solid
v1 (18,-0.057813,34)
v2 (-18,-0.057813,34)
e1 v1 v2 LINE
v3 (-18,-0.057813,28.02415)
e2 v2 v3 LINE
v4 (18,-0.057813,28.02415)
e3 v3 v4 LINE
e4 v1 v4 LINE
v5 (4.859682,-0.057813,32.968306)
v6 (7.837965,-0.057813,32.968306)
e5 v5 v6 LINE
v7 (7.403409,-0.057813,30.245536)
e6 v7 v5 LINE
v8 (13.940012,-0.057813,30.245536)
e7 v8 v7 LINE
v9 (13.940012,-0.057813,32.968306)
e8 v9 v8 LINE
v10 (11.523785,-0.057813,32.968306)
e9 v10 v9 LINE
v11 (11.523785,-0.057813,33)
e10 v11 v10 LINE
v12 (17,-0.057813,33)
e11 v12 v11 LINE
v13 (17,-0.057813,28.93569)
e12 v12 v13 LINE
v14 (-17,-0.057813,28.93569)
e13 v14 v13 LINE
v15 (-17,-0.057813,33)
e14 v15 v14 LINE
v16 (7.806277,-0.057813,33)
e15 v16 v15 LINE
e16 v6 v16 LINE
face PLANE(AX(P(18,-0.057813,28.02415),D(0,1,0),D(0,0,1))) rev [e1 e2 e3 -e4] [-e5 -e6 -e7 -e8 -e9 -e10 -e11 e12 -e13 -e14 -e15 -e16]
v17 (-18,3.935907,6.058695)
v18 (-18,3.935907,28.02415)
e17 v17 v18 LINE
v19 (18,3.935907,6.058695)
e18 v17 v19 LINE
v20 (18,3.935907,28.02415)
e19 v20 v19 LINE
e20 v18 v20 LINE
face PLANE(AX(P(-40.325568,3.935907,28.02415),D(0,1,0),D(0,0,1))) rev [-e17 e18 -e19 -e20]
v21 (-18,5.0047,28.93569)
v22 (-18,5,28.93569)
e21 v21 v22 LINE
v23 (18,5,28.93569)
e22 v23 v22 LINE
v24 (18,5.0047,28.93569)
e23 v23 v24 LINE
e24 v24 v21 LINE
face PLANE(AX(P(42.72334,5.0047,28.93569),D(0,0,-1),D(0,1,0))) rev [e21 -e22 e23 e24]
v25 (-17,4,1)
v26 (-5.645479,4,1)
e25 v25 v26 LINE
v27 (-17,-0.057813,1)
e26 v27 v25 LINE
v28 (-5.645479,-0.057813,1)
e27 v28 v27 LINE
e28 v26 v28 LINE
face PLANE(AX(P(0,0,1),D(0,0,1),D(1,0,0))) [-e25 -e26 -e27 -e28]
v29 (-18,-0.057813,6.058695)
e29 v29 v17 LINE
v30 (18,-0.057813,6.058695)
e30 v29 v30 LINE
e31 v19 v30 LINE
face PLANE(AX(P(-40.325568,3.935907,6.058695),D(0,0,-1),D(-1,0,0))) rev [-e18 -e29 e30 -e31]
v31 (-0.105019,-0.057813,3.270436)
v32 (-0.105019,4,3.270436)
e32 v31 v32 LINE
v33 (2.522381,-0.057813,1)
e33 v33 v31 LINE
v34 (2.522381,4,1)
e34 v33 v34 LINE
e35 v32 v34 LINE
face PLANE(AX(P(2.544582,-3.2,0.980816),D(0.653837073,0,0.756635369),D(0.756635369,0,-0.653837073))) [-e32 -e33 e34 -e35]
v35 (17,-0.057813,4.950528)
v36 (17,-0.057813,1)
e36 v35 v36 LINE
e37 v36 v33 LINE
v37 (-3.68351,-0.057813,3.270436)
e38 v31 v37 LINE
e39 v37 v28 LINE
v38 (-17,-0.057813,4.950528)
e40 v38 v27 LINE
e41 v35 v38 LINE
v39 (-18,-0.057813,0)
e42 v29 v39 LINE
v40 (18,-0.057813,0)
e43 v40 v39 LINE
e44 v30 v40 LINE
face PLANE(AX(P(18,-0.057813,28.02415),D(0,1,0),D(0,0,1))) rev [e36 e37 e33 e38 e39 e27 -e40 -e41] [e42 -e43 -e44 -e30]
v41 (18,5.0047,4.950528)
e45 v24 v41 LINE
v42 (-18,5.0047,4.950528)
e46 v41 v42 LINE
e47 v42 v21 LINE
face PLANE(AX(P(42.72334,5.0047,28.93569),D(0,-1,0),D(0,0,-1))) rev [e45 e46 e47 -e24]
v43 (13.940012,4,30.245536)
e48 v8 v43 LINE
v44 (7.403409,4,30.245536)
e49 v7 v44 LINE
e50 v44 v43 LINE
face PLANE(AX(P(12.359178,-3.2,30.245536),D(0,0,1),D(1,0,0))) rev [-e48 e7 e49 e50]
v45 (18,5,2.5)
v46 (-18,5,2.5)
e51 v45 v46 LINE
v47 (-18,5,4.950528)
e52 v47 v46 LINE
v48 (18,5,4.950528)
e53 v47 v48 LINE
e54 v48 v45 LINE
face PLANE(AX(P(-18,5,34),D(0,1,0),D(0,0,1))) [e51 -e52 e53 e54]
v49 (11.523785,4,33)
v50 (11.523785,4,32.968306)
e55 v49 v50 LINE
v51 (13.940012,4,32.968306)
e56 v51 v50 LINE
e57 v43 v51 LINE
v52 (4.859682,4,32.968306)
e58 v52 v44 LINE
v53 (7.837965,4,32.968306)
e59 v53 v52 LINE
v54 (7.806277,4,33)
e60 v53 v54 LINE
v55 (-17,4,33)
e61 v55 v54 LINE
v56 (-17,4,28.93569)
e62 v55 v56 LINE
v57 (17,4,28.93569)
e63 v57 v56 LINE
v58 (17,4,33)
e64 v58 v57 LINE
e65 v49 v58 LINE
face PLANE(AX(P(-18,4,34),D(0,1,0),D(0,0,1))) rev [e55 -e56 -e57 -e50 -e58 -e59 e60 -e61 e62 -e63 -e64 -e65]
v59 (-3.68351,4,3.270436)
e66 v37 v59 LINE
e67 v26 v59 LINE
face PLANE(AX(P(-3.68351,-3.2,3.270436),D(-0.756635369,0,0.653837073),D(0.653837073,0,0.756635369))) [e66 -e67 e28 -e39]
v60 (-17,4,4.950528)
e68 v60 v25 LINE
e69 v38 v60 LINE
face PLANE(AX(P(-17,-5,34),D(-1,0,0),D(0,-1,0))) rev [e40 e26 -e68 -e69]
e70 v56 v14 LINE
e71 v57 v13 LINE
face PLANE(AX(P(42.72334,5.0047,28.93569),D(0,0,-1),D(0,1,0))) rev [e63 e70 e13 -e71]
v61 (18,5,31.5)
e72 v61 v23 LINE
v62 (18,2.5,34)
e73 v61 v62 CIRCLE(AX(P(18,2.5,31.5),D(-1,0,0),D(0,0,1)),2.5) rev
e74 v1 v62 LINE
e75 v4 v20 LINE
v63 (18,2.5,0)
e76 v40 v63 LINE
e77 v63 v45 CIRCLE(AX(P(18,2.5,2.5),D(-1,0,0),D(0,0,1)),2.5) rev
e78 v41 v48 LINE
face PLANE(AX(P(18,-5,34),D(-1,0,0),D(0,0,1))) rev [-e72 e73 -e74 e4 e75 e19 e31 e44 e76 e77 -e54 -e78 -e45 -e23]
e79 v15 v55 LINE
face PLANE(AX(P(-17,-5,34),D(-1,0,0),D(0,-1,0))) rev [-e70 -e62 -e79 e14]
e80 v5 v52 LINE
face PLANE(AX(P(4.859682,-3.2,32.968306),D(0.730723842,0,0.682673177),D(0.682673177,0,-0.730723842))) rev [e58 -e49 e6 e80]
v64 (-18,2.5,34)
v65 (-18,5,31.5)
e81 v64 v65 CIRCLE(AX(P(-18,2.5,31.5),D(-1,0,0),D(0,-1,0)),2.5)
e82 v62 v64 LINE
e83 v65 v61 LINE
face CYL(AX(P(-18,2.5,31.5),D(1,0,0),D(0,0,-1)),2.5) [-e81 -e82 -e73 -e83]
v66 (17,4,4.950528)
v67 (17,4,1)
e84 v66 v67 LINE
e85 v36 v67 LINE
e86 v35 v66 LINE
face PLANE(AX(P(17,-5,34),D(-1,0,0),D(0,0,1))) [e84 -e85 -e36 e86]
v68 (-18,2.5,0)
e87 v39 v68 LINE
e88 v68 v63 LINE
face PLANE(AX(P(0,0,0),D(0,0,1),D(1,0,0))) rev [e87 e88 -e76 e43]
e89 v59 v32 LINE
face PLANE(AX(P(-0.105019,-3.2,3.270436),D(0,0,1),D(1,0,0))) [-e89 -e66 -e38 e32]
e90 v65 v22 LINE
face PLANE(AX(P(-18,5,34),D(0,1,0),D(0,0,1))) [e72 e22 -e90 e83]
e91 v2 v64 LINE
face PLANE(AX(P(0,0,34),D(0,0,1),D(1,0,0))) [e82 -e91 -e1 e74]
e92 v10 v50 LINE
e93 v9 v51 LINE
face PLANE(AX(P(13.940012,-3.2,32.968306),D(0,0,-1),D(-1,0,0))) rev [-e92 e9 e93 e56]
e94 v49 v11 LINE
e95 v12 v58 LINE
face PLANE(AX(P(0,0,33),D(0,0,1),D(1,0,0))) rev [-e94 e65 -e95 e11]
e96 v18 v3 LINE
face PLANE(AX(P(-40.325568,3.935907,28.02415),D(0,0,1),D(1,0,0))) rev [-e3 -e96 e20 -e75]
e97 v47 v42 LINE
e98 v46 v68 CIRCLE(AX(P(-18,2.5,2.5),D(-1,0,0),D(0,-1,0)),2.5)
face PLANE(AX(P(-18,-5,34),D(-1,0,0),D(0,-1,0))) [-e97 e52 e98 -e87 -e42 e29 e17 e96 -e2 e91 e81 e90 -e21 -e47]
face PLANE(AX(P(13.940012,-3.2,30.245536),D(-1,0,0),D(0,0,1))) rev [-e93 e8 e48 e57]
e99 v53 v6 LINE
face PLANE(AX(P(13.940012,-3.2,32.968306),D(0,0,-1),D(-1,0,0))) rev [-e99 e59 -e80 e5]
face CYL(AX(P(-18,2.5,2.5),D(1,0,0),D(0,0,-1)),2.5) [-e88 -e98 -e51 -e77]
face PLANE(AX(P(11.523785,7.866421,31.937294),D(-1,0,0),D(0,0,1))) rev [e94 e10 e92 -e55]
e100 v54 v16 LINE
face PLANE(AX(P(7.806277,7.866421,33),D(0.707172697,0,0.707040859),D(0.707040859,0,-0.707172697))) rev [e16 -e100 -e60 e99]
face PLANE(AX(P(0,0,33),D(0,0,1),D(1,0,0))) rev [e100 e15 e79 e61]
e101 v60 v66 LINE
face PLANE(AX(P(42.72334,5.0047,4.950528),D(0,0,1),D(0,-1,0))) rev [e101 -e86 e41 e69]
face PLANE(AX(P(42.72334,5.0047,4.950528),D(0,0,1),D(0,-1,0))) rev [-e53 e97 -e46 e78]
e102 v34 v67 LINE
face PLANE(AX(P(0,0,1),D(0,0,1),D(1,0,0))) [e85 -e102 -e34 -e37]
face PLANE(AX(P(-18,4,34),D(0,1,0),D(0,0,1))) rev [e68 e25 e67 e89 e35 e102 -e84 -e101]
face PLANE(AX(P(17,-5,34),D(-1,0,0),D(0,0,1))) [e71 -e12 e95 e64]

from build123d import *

# Parameters (mm, degrees)
SKETCH_3_W                      = 36
SKETCH_3_H                      = 10
EXTRUDE_1_DEPTH                 = 34
SHELL_1_T                       = -1
EXTRUDE_3_DEPTH                 = 18
EXTRUDE_3_DEPTH_BACK            = 18
SKETCH_4_W                      = 23.985162527
SKETCH_4_H                      = 5.996290528
FILLET_9_R                      = 2.5
EXTRUDE_6_DEPTH                 = 4
EXTRUDE_6_DEPTH_BACK            = 3.2
EXTRUDE_7_DEPTH                 = 4
EXTRUDE_7_DEPTH_BACK            = 3.2
FILLET_11_R                     = 2.5
EXTRUDE_START                   = -5
EXTRUDE_8_DEPTH                 = 9
CUT_EXTRUDE_START               = 17
SKETCH_8_W                      = 9.2
SKETCH_8_H                      = 1.40146724
CUT_EXTRUDE_3_DEPTH             = 0.5
CUT_EXTRUDE_4_REACH             = 40.795
SKETCH_11_W                     = 21.965454815
SKETCH_11_H                     = 3.993719057
CUT_EXTRUDE_4_DIRECTION_2_REACH = 40.795
SKETCH_10_W                     = 1.1
SKETCH_10_H                     = 7.7
SKETCH_10_W_2                   = 1.122304396
SKETCH_10_W_3                   = 1.111152198
SKETCH_10_W_4                   = 1.088342312
SKETCH_10_W_5                   = 1.094171156
CUT_EXTRUDE_5_DEPTH             = 0.991590454
SPLIT_START                     = -5
SPLIT_BODIES_2_OUTLINE_W        = 36
SPLIT_BODIES_2_OUTLINE_H        = 34
SPLIT_BODIES_2_OUTLINE_W_2      = 1.1
SPLIT_BODIES_2_OUTLINE_H_2      = 7.7
SPLIT_BODIES_2_OUTLINE_W_3      = 1.111152198
SPLIT_BODIES_2_OUTLINE_W_4      = 1.094171156
SPLIT_BODIES_2_OUTLINE_W_5      = 1.122304396
SPLIT_BODIES_2_OUTLINE_W_6      = 1.088342312
SPLIT_BODIES_2_DEPTH            = 4.942187478


# Read off the part's stored shape, not the designer's step: 分割1, 分割2
with BuildPart() as part:
    # 草图3 → 凸台-拉伸1 (new body)
    with BuildSketch(Plane.XY):
        Rectangle(SKETCH_3_W, SKETCH_3_H)
    extrude(amount=EXTRUDE_1_DEPTH)

    # 抽壳1
    shell_1_openings = [part.faces().sort_by_distance(p)[0] for p in [
        (0, -5, 17),
    ]]
    offset(amount=SHELL_1_T, openings=shell_1_openings, kind=Kind.INTERSECTION)

    # 草图4 → 凸台-拉伸3 (add, two sides: drawn at the far end of the back side and taken through both)
    with BuildSketch(Plane(origin=(0, 0, 0), x_dir=(0, 0, -1), z_dir=(1, 0, 0)).offset(-EXTRUDE_3_DEPTH_BACK)):
        with Locations((-16.943109173, 2.00655481)):
            Rectangle(SKETCH_4_W, SKETCH_4_H)
    extrude(amount=EXTRUDE_3_DEPTH + EXTRUDE_3_DEPTH_BACK)

    # 圆角9
    fillet_9_edges = [part.edges().sort_by_distance(p)[0] for p in [
        (0, 5, 34),
    ]]
    fillet(fillet_9_edges, radius=FILLET_9_R)

    # 草图6 → 凸台-拉伸6 (add, two sides: drawn at the far end of the back side and taken through both)
    with BuildSketch(Plane(origin=(0, 0, 0), x_dir=(1, 0, 0), z_dir=(0, 1, 0)).offset(-EXTRUDE_6_DEPTH_BACK)):
        Polygon((4.859681811, -32.9683063), (7.403408748, -30.245536487), (12.359177608, -30.245536487), (13.940012235, -30.245536487), (13.940012235, -32.9683063), align=None)
    extrude(amount=EXTRUDE_6_DEPTH + EXTRUDE_6_DEPTH_BACK)

    # 草图7 → 凸台-拉伸7 (add, two sides: drawn at the far end of the back side and taken through both)
    with BuildSketch(Plane(origin=(0, 0, 0), x_dir=(1, 0, 0), z_dir=(0, 1, 0)).offset(-EXTRUDE_7_DEPTH_BACK)):
        Polygon((2.54458171, -0.980815803), (-0.105019187, -3.27043557), (-3.683509766, -3.27043557), (-5.662056301, -0.980815803), align=None)
    extrude(amount=EXTRUDE_7_DEPTH + EXTRUDE_7_DEPTH_BACK)

    # 圆角11
    fillet_11_edges = [part.edges().sort_by_distance(p)[0] for p in [
        (0, 5, 0),
    ]]
    fillet(fillet_11_edges, radius=FILLET_11_R)

    # 草图5 → 凸台-拉伸8 (add)
    with BuildSketch(Plane(origin=(0, 0, 0), x_dir=(1, 0, 0), z_dir=(0, 1, 0)).offset(EXTRUDE_START)):
        Polygon((-3.212354085, -1), (-2.299075535, -1.958092867), (-1.257675535, -1.958092867), (-0.046128087, -1), align=None)
        Polygon((7.806276899, -33), (8.868785029, -31.937293749), (11.523785029, -31.937293749), (11.523785029, -33), align=None)
    extrude(amount=EXTRUDE_8_DEPTH)

    # 草图8 → 切除-拉伸3 (cut)
    with BuildSketch(Plane(origin=(0, 0, 0), x_dir=(0, 0, -1), z_dir=(1, 0, 0)).offset(CUT_EXTRUDE_START)):
        with Locations((-26.021321233, -4.299270344)):
            Rectangle(SKETCH_8_W, SKETCH_8_H)
    extrude(amount=CUT_EXTRUDE_3_DEPTH, mode=Mode.SUBTRACT)

    # 切除-拉伸4: up to this face of the body (flat: up to its plane)
    cut_extrude_4_end = Plane(part.part.faces().sort_by_distance((-18, -0.033638706, 16.999980993))[0])
    # 草图11 → 切除-拉伸4 (cut, up to the picked face)
    with BuildSketch(Plane(origin=(0, 0, 0), x_dir=(0, 0, -1), z_dir=(1, 0, 0)), mode=Mode.PRIVATE) as cut_extrude_4_sk1:
        with Locations((-17.041422709, 1.939047007)):
            Rectangle(SKETCH_11_W, SKETCH_11_H)
    cut_extrude_4_tool1 = split(extrude(cut_extrude_4_sk1.sketch, amount=-CUT_EXTRUDE_4_REACH, mode=Mode.PRIVATE), bisect_by=cut_extrude_4_end, keep=Keep.BOTH, mode=Mode.PRIVATE)
    add(cut_extrude_4_tool1.solids().sort_by(Axis((0, 1.939047, 17.041423), (-1, 0, 0)))[0], mode=Mode.SUBTRACT)

    # 切除-拉伸4 direction 2: up to this face of the body (flat: up to its plane)
    cut_extrude_4_direction_2_end = Plane(part.part.faces().sort_by_distance((18, -0.033638706, 16.999980993))[0])
    # 草图11 → 切除-拉伸4 direction 2 (cut, up to the picked face)
    with BuildSketch(Plane(origin=(0, 0, 0), x_dir=(0, 0, -1), z_dir=(1, 0, 0)), mode=Mode.PRIVATE) as cut_extrude_4_direction_2_sk1:
        with Locations((-17.041422709, 1.939047007)):
            Rectangle(SKETCH_11_W, SKETCH_11_H)
    cut_extrude_4_direction_2_tool1 = split(extrude(cut_extrude_4_direction_2_sk1.sketch, amount=CUT_EXTRUDE_4_DIRECTION_2_REACH, mode=Mode.PRIVATE), bisect_by=cut_extrude_4_direction_2_end, keep=Keep.BOTH, mode=Mode.PRIVATE)
    add(cut_extrude_4_direction_2_tool1.solids().sort_by(Axis((0, 1.939047, 17.041423), (1, 0, 0)))[0], mode=Mode.SUBTRACT)

    # 草图10 → 切除-拉伸5 (cut)
    with BuildSketch(Plane(origin=(0, 0, 0), x_dir=(1, 0, 0), z_dir=(0, 1, 0))):
        with Locations((-10.631432442, -10.52972417)):
            Rectangle(SKETCH_10_W, SKETCH_10_H)
        with Locations((-10.631432442, -20.605915071)):
            Rectangle(SKETCH_10_W, SKETCH_10_H)
        with Locations((10.829939073, -20.605915071)):
            Rectangle(SKETCH_10_W, SKETCH_10_H)
        with Locations((10.829939073, -10.52972417)):
            Rectangle(SKETCH_10_W, SKETCH_10_H)
        with Locations((-6.938026669, -10.52972417)):
            Rectangle(SKETCH_10_W_2, SKETCH_10_H)
        with Locations((-6.943602768, -20.605915071)):
            Rectangle(SKETCH_10_W_3, SKETCH_10_H)
        with Locations((7.321076066, -10.52972417)):
            Rectangle(SKETCH_10_W_4, SKETCH_10_H)
        with Locations((7.323990488, -20.605915071)):
            Rectangle(SKETCH_10_W_5, SKETCH_10_H)
    extrude(amount=-CUT_EXTRUDE_5_DEPTH, mode=Mode.SUBTRACT)


with BuildPart() as body_2:
    # Split Bodies 1: the piece on the far side of the plane
    add(part.part)
    split(bisect_by=Plane(origin=(0, -0.057812522, 0), x_dir=(1, 0, 0), z_dir=(0, 1, 0)), keep=Keep.BOTTOM)

    # Split Bodies 2 outline → Split Bodies 2 (cut)
    with BuildSketch(Plane(origin=(0, 0, 0), x_dir=(1, 0, 0), z_dir=(0, 1, 0)).offset(SPLIT_START)):
        with Locations((0, -17)):
            Rectangle(SPLIT_BODIES_2_OUTLINE_W, SPLIT_BODIES_2_OUTLINE_H)
        Polygon((-17, -28.935690436), (17, -28.935690436), (17, -33), (11.523785029, -33), (11.523785029, -32.9683063), (13.940012235, -32.9683063), (13.940012235, -30.245536487), (7.403408748, -30.245536487), (4.859681811, -32.9683063), (7.83796469, -32.9683063), (7.806276899, -33), (-17, -33), align=None, mode=Mode.SUBTRACT)
        Polygon((17, -4.950527909), (-17, -4.950527909), (-17, -1), (-5.645478515, -1), (-3.683509766, -3.27043557), (-0.105019187, -3.27043557), (2.522381315, -1), (17, -1), align=None, mode=Mode.SUBTRACT)
        with Locations((-10.631432442, -20.605915071)):
            Rectangle(SPLIT_BODIES_2_OUTLINE_W_2, SPLIT_BODIES_2_OUTLINE_H_2, mode=Mode.SUBTRACT)
        with Locations((-6.943602768, -20.605915071)):
            Rectangle(SPLIT_BODIES_2_OUTLINE_W_3, SPLIT_BODIES_2_OUTLINE_H_2, mode=Mode.SUBTRACT)
        with Locations((7.323990488, -20.605915071)):
            Rectangle(SPLIT_BODIES_2_OUTLINE_W_4, SPLIT_BODIES_2_OUTLINE_H_2, mode=Mode.SUBTRACT)
        with Locations((10.829939073, -20.605915071)):
            Rectangle(SPLIT_BODIES_2_OUTLINE_W_2, SPLIT_BODIES_2_OUTLINE_H_2, mode=Mode.SUBTRACT)
        with Locations((-10.631432442, -10.52972417)):
            Rectangle(SPLIT_BODIES_2_OUTLINE_W_2, SPLIT_BODIES_2_OUTLINE_H_2, mode=Mode.SUBTRACT)
        with Locations((-6.938026669, -10.52972417)):
            Rectangle(SPLIT_BODIES_2_OUTLINE_W_5, SPLIT_BODIES_2_OUTLINE_H_2, mode=Mode.SUBTRACT)
        with Locations((7.321076066, -10.52972417)):
            Rectangle(SPLIT_BODIES_2_OUTLINE_W_6, SPLIT_BODIES_2_OUTLINE_H_2, mode=Mode.SUBTRACT)
        with Locations((10.829939073, -10.52972417)):
            Rectangle(SPLIT_BODIES_2_OUTLINE_W_2, SPLIT_BODIES_2_OUTLINE_H_2, mode=Mode.SUBTRACT)
    extrude(amount=SPLIT_BODIES_2_DEPTH, mode=Mode.SUBTRACT)


with BuildPart() as part_1:
    add(part.part)

    # Split Bodies 1
    split(bisect_by=Plane(origin=(0, -0.057812522, 0), x_dir=(1, 0, 0), z_dir=(0, 1, 0)), keep=Keep.TOP)


solid = part_1.part
